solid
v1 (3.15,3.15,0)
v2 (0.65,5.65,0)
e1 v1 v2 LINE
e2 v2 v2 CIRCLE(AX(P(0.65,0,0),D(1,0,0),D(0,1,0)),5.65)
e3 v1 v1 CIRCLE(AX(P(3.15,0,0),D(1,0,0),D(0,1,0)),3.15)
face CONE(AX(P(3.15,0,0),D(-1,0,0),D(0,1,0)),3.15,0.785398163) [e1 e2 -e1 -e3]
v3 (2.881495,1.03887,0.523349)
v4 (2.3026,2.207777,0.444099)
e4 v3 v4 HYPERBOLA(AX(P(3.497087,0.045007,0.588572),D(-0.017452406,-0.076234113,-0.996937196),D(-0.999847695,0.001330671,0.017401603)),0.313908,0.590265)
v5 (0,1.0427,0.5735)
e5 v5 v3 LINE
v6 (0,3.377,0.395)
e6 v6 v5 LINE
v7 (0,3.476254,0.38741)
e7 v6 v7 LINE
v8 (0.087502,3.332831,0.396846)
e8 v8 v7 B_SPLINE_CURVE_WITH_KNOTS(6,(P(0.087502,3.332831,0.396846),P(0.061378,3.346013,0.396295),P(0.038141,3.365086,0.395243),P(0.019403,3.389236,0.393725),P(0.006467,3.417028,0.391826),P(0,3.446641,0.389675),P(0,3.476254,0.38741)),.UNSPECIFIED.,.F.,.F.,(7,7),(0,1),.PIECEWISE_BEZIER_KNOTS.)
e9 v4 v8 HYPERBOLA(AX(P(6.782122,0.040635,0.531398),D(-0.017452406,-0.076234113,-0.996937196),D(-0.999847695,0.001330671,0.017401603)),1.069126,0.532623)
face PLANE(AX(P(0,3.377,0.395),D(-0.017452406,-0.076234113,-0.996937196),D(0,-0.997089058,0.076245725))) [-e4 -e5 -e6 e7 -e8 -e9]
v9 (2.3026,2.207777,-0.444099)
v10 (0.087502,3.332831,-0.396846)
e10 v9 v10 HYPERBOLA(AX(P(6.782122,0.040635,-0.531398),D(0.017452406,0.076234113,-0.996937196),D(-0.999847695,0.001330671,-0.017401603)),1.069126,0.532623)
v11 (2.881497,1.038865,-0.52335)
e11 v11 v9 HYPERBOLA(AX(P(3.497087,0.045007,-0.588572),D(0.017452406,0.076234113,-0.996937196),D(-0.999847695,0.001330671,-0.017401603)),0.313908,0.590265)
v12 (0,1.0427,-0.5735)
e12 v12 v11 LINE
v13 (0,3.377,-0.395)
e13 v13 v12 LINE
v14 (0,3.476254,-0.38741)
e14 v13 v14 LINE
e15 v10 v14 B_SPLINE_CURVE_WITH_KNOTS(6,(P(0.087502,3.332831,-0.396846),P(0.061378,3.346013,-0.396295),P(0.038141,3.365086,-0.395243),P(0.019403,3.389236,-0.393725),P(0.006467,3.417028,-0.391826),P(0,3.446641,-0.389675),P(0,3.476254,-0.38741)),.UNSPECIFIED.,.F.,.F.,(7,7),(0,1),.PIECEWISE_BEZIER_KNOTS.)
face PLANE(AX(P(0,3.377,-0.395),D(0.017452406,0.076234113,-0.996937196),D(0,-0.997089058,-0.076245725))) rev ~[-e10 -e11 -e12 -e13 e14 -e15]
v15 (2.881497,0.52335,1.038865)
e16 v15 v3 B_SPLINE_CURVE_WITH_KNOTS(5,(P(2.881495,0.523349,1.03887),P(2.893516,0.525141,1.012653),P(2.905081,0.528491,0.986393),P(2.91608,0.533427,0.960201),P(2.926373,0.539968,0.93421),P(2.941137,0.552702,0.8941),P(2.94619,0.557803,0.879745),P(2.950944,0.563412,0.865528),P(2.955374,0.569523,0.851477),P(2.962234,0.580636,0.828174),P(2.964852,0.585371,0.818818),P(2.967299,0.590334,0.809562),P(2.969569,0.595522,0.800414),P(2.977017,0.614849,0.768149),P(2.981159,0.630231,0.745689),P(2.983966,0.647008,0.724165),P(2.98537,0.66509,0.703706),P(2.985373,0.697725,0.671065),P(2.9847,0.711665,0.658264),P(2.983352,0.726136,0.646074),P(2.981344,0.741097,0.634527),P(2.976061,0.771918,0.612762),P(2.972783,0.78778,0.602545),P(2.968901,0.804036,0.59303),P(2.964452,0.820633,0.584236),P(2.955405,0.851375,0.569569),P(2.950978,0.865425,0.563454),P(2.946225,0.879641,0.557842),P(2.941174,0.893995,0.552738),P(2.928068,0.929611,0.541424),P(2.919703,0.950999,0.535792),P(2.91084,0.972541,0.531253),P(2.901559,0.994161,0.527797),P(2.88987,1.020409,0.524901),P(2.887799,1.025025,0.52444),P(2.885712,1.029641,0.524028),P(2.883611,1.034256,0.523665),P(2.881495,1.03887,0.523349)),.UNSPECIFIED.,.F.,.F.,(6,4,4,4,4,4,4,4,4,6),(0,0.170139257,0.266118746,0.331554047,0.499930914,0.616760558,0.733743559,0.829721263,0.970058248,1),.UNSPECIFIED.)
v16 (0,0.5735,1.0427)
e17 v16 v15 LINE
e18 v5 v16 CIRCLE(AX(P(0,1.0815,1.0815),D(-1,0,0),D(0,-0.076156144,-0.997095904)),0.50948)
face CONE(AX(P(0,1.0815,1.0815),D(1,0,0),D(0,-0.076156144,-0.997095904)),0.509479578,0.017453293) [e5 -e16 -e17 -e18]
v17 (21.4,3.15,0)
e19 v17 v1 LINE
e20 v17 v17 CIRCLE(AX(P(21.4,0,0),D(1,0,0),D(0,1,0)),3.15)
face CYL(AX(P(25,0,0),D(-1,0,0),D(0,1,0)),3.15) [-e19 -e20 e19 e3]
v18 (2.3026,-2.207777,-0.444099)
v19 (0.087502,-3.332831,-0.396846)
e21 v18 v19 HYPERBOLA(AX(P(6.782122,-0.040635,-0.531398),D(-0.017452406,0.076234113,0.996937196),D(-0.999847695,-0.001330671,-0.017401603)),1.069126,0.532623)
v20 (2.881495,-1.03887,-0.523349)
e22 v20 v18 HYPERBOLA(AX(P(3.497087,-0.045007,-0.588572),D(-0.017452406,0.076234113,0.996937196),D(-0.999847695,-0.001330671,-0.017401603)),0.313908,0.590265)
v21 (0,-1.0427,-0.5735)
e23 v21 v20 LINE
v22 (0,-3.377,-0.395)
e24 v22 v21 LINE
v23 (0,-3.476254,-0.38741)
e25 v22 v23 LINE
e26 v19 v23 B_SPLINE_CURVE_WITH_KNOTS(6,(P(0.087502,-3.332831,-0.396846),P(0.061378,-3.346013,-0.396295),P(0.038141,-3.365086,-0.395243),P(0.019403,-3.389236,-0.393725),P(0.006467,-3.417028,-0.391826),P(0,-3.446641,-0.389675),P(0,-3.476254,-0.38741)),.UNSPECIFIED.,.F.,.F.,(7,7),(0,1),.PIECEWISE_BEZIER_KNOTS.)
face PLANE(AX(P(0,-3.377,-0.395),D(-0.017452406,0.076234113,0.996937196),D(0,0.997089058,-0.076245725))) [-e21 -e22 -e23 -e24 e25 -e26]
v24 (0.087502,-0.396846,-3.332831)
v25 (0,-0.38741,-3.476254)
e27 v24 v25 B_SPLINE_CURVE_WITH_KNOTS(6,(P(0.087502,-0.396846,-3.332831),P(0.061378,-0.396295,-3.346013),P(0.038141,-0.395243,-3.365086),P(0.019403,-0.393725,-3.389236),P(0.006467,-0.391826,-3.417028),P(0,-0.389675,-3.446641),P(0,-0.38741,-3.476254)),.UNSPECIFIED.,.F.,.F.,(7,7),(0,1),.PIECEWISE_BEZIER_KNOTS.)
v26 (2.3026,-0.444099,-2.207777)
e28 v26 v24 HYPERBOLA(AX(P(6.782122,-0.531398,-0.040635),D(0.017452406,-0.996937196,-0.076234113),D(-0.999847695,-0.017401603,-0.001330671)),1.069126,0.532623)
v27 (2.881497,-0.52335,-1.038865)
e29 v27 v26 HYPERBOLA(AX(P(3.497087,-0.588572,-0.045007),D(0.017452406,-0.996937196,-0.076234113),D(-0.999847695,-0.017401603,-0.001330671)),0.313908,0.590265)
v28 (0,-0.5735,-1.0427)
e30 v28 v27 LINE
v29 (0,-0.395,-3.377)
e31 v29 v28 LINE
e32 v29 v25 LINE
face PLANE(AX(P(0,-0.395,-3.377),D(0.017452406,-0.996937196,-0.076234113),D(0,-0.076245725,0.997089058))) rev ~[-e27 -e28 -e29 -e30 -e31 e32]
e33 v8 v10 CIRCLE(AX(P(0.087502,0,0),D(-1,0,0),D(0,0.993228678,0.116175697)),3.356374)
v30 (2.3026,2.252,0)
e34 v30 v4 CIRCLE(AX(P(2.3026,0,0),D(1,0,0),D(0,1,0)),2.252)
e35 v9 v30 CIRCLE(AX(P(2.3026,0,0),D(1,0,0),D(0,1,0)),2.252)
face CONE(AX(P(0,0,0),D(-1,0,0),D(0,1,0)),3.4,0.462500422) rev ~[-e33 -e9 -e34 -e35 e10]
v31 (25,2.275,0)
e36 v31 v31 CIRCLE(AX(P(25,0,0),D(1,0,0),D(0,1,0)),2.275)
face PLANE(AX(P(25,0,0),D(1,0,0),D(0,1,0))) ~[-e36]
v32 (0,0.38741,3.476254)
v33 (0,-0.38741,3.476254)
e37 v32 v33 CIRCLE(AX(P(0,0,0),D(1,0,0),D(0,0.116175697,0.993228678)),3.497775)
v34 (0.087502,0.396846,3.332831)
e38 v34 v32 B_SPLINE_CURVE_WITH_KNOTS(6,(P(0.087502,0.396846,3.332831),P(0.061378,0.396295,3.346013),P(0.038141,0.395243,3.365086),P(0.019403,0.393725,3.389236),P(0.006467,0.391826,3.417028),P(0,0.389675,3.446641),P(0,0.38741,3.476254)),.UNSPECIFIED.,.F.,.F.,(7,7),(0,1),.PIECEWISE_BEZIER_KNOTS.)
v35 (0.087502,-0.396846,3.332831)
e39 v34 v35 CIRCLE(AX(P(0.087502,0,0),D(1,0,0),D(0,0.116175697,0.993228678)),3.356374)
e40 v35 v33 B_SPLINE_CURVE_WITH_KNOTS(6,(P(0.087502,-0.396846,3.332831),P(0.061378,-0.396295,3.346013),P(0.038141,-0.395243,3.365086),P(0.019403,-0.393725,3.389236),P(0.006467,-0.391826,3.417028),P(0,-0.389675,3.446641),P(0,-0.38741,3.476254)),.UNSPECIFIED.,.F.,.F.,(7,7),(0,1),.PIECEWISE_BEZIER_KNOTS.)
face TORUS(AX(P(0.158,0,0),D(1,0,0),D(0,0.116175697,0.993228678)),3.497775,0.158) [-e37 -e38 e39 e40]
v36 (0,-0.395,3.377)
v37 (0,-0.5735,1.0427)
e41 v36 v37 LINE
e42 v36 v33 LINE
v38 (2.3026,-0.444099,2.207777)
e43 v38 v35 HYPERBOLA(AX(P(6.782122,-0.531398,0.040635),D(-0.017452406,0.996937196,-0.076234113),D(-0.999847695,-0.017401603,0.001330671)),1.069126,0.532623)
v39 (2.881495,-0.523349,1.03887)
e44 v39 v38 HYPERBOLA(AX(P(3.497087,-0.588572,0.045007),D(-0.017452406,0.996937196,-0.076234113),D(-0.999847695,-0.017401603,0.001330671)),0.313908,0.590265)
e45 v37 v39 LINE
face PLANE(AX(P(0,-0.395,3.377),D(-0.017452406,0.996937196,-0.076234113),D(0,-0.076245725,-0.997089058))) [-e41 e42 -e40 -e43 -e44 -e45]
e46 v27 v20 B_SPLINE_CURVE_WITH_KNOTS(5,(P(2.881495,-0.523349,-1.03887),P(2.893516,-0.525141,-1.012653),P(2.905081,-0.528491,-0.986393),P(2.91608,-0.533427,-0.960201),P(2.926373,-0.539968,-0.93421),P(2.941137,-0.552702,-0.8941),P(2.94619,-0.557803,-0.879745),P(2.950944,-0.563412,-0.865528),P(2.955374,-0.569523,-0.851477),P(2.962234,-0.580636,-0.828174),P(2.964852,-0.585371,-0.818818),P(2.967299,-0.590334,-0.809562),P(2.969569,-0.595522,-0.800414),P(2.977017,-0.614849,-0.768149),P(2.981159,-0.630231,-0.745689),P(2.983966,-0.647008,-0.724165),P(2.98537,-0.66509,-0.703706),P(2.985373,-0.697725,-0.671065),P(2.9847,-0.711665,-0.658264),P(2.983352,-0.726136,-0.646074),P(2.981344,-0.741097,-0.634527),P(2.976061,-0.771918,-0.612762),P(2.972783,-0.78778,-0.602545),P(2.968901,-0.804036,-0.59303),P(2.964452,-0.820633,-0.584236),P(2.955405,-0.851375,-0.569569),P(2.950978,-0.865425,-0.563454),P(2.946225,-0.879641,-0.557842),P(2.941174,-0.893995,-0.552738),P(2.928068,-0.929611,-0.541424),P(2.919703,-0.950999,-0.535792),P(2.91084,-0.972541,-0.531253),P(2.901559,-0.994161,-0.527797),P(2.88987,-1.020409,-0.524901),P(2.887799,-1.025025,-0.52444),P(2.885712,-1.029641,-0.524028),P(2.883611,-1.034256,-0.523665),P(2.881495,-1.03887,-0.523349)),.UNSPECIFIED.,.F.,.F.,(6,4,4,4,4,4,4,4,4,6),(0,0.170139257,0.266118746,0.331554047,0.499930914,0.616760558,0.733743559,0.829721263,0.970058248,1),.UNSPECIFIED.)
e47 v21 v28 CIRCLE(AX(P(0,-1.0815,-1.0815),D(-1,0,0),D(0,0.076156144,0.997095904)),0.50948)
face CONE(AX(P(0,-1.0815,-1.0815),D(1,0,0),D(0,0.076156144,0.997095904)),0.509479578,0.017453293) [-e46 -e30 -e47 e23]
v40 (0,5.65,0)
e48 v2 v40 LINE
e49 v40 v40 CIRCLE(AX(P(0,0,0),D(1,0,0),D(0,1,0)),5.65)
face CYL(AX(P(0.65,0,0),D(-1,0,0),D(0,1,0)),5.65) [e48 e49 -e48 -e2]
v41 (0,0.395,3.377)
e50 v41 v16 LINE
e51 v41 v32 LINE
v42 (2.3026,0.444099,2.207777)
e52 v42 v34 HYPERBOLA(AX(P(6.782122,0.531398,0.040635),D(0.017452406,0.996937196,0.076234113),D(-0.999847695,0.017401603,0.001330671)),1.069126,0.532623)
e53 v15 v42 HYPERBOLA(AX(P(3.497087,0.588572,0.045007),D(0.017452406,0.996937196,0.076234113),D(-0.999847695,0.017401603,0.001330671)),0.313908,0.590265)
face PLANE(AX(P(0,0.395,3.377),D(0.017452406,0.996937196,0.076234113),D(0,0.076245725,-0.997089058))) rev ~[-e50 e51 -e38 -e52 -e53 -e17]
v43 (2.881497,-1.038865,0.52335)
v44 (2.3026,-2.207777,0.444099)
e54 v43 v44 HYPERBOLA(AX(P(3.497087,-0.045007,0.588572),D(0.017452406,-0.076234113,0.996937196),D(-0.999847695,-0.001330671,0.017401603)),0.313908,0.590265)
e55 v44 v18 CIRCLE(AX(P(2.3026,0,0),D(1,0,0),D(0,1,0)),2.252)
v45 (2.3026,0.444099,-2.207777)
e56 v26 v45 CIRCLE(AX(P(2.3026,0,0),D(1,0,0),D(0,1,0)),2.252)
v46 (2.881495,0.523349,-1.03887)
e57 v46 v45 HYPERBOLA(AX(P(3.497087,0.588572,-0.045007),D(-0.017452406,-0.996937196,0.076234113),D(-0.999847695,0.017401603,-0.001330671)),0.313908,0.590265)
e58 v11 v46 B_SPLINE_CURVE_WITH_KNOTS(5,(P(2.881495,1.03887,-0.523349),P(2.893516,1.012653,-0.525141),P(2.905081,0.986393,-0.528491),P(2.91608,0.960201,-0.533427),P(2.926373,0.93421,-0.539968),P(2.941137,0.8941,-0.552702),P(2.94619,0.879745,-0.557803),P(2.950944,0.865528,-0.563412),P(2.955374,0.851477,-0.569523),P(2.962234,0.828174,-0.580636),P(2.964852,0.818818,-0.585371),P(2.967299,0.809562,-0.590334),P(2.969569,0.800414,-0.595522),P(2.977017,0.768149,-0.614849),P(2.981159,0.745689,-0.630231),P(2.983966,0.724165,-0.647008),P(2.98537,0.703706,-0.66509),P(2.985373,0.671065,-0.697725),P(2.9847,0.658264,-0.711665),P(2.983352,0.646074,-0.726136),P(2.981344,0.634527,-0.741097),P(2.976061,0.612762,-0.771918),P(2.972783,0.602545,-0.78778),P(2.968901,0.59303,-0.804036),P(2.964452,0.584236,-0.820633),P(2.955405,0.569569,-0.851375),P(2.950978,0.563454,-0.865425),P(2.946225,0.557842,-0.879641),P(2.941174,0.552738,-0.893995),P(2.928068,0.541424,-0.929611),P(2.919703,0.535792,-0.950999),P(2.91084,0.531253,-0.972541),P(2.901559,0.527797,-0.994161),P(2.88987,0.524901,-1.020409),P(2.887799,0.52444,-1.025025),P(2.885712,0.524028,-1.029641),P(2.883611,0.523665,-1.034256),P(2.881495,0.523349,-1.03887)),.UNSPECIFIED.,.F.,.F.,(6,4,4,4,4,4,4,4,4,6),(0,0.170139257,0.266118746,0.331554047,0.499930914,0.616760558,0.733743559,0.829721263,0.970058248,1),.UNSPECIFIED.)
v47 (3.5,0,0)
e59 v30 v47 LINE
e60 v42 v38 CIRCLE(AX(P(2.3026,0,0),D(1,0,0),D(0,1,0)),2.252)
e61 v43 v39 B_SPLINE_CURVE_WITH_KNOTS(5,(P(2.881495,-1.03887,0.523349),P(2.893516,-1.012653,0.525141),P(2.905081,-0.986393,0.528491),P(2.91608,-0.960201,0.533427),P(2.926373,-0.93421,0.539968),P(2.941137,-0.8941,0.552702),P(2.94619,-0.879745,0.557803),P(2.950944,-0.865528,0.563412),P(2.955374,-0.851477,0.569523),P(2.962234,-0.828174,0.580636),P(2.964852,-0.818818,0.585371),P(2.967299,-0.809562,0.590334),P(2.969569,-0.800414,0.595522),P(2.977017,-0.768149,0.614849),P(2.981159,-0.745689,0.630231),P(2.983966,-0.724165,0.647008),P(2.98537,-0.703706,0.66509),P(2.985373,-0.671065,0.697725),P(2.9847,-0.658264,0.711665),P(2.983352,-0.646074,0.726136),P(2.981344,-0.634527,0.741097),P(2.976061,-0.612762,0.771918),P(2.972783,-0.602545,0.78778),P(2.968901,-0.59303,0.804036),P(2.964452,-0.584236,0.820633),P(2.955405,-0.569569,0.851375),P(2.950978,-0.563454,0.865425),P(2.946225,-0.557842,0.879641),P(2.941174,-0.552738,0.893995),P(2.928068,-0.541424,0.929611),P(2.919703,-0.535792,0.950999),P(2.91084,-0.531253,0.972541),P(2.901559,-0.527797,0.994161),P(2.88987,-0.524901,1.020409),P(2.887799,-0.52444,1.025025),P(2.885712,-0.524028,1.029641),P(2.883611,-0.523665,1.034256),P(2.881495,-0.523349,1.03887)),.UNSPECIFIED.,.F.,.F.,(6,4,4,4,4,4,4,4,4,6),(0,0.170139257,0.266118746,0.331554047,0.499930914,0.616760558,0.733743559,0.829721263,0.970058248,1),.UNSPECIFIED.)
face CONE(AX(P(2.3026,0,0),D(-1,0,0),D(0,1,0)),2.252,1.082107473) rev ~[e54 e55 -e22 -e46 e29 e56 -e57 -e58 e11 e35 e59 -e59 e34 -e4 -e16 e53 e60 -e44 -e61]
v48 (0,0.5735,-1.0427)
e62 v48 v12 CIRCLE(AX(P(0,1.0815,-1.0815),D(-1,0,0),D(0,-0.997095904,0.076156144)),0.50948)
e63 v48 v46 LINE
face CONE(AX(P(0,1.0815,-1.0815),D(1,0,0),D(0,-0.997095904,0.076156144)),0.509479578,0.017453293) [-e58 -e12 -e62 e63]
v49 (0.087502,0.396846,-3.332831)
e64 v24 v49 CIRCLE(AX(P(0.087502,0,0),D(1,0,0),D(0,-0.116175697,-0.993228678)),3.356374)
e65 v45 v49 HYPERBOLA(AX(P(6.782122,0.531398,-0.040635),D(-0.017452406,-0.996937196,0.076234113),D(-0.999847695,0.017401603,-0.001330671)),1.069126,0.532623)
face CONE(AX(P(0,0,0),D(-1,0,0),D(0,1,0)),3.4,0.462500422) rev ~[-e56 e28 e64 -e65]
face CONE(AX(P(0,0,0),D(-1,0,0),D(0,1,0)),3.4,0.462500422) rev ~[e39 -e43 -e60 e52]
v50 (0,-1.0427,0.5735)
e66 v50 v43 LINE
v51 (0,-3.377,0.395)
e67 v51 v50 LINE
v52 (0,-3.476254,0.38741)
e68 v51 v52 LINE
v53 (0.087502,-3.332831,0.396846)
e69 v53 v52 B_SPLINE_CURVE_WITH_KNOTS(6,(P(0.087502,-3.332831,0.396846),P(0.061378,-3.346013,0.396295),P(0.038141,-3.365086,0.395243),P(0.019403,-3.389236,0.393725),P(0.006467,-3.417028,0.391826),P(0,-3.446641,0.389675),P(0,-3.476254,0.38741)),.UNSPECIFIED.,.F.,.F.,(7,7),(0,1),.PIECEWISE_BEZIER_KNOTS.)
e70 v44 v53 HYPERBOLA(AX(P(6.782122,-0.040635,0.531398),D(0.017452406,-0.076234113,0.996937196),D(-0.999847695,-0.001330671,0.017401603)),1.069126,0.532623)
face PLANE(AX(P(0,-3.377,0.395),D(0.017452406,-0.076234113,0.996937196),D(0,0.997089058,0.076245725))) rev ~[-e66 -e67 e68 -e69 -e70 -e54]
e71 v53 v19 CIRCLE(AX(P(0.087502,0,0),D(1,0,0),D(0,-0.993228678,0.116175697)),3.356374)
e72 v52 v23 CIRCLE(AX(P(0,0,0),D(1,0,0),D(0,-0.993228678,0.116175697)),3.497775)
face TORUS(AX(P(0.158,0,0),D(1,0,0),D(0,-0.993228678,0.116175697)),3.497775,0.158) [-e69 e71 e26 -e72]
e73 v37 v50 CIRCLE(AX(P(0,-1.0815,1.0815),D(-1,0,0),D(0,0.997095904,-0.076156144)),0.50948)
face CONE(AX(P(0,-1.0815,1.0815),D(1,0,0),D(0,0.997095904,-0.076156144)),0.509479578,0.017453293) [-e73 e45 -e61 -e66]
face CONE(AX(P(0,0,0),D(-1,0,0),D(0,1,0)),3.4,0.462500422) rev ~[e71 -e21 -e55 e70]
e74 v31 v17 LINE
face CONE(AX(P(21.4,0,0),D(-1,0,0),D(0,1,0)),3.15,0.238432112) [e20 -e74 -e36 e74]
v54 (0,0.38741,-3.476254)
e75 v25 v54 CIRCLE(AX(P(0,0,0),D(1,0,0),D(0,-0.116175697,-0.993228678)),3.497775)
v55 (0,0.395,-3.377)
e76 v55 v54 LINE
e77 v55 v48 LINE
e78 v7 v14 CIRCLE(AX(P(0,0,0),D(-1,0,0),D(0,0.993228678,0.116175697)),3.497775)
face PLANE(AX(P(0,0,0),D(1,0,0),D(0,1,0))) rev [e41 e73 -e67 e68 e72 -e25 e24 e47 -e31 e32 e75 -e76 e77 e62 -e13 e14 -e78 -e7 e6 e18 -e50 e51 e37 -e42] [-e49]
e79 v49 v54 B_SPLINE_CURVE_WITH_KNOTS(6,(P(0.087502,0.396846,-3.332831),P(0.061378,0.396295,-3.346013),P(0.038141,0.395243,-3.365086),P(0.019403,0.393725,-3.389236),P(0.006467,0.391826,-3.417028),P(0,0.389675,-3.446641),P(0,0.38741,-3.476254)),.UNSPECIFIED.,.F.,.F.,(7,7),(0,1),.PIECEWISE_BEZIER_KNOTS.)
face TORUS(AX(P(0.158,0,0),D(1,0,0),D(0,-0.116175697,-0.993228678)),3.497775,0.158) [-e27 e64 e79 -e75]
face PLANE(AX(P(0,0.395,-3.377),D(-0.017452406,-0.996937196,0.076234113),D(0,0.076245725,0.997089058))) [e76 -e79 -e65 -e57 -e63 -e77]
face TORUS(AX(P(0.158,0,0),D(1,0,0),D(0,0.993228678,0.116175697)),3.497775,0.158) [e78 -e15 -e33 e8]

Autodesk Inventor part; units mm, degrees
ref_plane "YZ Plane" through (0, 0, 0) normal (1, 0, 0) x (0, 1, 0)
ref_plane "XZ Plane" through (0, 0, 0) normal (0, 1, 0) x (-1, 0, 0)
sketch "Sketch1" plane through (0, 0, 0) normal (0, 0, 1) x (1, 0, 0)
  line L0 (3.5, 0) -> (25, 0)
  line L1 (25, 0) -> (25, 3.15)
  line L2 (25, 3.15) -> (3.15, 3.15)
  line L3 (0.65, 5.65) -> (0, 5.65)
  line L4 (-5, 0) -> (30, 0) projected
  line L5 (0, -1.13) -> (0, 6.78) projected
  line L6 (0, 3.4) -> (2.3026, 2.252)
  line L7 (2.3026, 2.252) -> (3.5, 0)
  line L8 (3.15, 3.15) -> (0.65, 5.65)
  line L9 (0, 5.65) -> (0, 3.4)
  dimension "d2" = 6.3
  dimension "d3" = 11.3
  dimension "d4" = 3.5
  dimension "d5" = 6.8
  dimension "d6" = 26.5
  dimension "d7" = 62
  dimension "d13" = 45
  dimension "d14" = 3.15
  dimension "d15" = 25
revolve "Body" add sketch "Sketch1" angle 360 about axis through (3.5, 0, 0) along (1, 0, 0) contours L7 L6 L5 L3 L8 L2 L1 L0
sketch "Sketch2" plane through (0, 0, 0) normal (-1, 0, 0) x (0, 0, 1)
  line L0 (0, -7.91) -> (0, 7.91) projected
  line L1 (-7.91, 0) -> (7.91, 0) projected
  line L2 (0, 3.4) -> (0, 0) construction
  line L3 (0, 0) -> (3.4, 0) construction
  arc A0 (1.02, 0) -> (0, 1.02) centre (0, 0) ccw construction
  line L4 (0, 0) -> (3.9952, 3.9952) construction
  arc A1 (1.19, 0) -> (0, 1.19) centre (0, 0) ccw construction
  line L5 (0.395, 3.377) -> (0.5735, 1.0427)
  line L6 (3.377, 0.395) -> (1.0427, 0.5735)
  arc A2 (0.5735, 1.0427) -> (1.0427, 0.5735) centre (1.0815, 1.0815) ccw
  arc A3 (3.4, 0) -> (3.377, 0.395) centre (0, 0) ccw
  arc A4 (0.395, 3.377) -> (0, 3.4) centre (0, 0) ccw
  arc A5 (3.377, 0.395) -> (0.395, 3.377) centre (0, 0) ccw
  line L7 (0.395, -3.377) -> (0.5735, -1.0427)
  line L8 (3.377, -0.395) -> (1.0427, -0.5735)
  arc A6 (1.0427, -0.5735) -> (0.5735, -1.0427) centre (1.0815, -1.0815) ccw
  arc A7 (3.377, -0.395) -> (3.4, 0) centre (0, 0) ccw
  arc A8 (0, -3.4) -> (0.395, -3.377) centre (0, 0) ccw
  arc A9 (0.395, -3.377) -> (3.377, -0.395) centre (0, 0) ccw
  line L9 (-0.395, 3.377) -> (-0.5735, 1.0427)
  line L10 (-3.377, 0.395) -> (-1.0427, 0.5735)
  arc A10 (-1.0427, 0.5735) -> (-0.5735, 1.0427) centre (-1.0815, 1.0815) ccw
  arc A11 (-3.377, 0.395) -> (-3.4, 0) centre (0, 0) ccw
  arc A12 (0, 3.4) -> (-0.395, 3.377) centre (0, 0) ccw
  arc A13 (-0.395, 3.377) -> (-3.377, 0.395) centre (0, 0) ccw
  arc A14 (-3.377, -0.395) -> (-0.395, -3.377) centre (0, 0) ccw
  arc A15 (-0.395, -3.377) -> (0, -3.4) centre (0, 0) ccw
  arc A16 (-3.4, 0) -> (-3.377, -0.395) centre (0, 0) ccw
  line L11 (-3.377, -0.395) -> (-1.0427, -0.5735)
  arc A17 (-0.5735, -1.0427) -> (-1.0427, -0.5735) centre (-1.0815, -1.0815) ccw
  line L12 (-0.395, -3.377) -> (-0.5735, -1.0427)
  circle A18 centre (0, 0) radius 5.65 projected
  circle A19 centre (0, 0) radius 3.4 projected
  dimension "d18" = 45
  dimension "d19" = 2.04
  dimension "d20" = 2.38
  dimension "d21" = 6.8
  dimension "d22" = 0.395
extrude "Slot" add sketch "Sketch2" against normal up to next draft 1 contours L7 A6 L8 A9 | A14 L11 A17 L12 | A13 L9 A10 L10 | L6 A2 L5 A5
fillet "Fillet1" radius 0.158 4 edges at (0, 3.4, 0) (0, 0, 3.4) (0, -3.4, 0) (0, 0, -3.4)
thread "Thread" size "ST6.3x1.8" class "6g" standard "Metric Forming Screw Threads" length 21.85
chamfer "Chamfer1" distance 0.875 distance2 3.6 1 edges at (25, -3.15, 0) measured on face at (25, 1.1633, 0.933)
ref_plane "Work Plane2" through (2.8, 0, 0) normal (0, 1, 0) x (1, 0, 0)
equation "\"d2\" = NND"
equation "\"d3\" = KOD"
equation "\"d4\" = STI"
equation "\"d5\" = SDM"
equation "\"d13\" = 0.5 * SEWI"
equation "\"d14\" = KOH"
equation "\"d15\" = NLG"
equation "\"d19\" = 0.3 * SDM"
equation "\"d20\" = 0.35 * SDM"
equation "\"d21\" = SDM"
equation "\"d22\" = 0.5 * SBR"
equation "\"d45\" = STI"
equation "\"d25\" = 0.2 * SBR"
equation "\"d9\" = GEL"
equation "\"d11\" = -0.5 * GD2 + 0.5 * NND"
equation "\"d12\" = SPTZ"
equation "\"NND\" = 6.3"
equation "\"NLG\" = 25"
equation "\"GEL\" = 21.85"
equation "\"KOD\" = 11.3"
equation "\"KOH\" = 3.15"
equation "\"SDM\" = 6.8"
equation "\"STI\" = 3.5"
equation "\"SBR\" = 0.79"
equation "\"SPTZ\" = 3.6"
equation "\"GD2\" = 4.55"
equation "\"SEWI\" = 90deg"
equation "\"d0\" = NLG"
equation "\"d1\" = KOH"
equation "\"d17\" = SDM"
equation "\"EPV\" = 6.3"
equation "\"THREADDIA\" = 6.3"
equation "\"TOA\" = 30deg"
equation "\"PTC\" = 1.8"
equation "\"GD1\" = 4.88"
properties part number "ISO 7050 - ST6,3 x 25 - F - H" material "Steel"
